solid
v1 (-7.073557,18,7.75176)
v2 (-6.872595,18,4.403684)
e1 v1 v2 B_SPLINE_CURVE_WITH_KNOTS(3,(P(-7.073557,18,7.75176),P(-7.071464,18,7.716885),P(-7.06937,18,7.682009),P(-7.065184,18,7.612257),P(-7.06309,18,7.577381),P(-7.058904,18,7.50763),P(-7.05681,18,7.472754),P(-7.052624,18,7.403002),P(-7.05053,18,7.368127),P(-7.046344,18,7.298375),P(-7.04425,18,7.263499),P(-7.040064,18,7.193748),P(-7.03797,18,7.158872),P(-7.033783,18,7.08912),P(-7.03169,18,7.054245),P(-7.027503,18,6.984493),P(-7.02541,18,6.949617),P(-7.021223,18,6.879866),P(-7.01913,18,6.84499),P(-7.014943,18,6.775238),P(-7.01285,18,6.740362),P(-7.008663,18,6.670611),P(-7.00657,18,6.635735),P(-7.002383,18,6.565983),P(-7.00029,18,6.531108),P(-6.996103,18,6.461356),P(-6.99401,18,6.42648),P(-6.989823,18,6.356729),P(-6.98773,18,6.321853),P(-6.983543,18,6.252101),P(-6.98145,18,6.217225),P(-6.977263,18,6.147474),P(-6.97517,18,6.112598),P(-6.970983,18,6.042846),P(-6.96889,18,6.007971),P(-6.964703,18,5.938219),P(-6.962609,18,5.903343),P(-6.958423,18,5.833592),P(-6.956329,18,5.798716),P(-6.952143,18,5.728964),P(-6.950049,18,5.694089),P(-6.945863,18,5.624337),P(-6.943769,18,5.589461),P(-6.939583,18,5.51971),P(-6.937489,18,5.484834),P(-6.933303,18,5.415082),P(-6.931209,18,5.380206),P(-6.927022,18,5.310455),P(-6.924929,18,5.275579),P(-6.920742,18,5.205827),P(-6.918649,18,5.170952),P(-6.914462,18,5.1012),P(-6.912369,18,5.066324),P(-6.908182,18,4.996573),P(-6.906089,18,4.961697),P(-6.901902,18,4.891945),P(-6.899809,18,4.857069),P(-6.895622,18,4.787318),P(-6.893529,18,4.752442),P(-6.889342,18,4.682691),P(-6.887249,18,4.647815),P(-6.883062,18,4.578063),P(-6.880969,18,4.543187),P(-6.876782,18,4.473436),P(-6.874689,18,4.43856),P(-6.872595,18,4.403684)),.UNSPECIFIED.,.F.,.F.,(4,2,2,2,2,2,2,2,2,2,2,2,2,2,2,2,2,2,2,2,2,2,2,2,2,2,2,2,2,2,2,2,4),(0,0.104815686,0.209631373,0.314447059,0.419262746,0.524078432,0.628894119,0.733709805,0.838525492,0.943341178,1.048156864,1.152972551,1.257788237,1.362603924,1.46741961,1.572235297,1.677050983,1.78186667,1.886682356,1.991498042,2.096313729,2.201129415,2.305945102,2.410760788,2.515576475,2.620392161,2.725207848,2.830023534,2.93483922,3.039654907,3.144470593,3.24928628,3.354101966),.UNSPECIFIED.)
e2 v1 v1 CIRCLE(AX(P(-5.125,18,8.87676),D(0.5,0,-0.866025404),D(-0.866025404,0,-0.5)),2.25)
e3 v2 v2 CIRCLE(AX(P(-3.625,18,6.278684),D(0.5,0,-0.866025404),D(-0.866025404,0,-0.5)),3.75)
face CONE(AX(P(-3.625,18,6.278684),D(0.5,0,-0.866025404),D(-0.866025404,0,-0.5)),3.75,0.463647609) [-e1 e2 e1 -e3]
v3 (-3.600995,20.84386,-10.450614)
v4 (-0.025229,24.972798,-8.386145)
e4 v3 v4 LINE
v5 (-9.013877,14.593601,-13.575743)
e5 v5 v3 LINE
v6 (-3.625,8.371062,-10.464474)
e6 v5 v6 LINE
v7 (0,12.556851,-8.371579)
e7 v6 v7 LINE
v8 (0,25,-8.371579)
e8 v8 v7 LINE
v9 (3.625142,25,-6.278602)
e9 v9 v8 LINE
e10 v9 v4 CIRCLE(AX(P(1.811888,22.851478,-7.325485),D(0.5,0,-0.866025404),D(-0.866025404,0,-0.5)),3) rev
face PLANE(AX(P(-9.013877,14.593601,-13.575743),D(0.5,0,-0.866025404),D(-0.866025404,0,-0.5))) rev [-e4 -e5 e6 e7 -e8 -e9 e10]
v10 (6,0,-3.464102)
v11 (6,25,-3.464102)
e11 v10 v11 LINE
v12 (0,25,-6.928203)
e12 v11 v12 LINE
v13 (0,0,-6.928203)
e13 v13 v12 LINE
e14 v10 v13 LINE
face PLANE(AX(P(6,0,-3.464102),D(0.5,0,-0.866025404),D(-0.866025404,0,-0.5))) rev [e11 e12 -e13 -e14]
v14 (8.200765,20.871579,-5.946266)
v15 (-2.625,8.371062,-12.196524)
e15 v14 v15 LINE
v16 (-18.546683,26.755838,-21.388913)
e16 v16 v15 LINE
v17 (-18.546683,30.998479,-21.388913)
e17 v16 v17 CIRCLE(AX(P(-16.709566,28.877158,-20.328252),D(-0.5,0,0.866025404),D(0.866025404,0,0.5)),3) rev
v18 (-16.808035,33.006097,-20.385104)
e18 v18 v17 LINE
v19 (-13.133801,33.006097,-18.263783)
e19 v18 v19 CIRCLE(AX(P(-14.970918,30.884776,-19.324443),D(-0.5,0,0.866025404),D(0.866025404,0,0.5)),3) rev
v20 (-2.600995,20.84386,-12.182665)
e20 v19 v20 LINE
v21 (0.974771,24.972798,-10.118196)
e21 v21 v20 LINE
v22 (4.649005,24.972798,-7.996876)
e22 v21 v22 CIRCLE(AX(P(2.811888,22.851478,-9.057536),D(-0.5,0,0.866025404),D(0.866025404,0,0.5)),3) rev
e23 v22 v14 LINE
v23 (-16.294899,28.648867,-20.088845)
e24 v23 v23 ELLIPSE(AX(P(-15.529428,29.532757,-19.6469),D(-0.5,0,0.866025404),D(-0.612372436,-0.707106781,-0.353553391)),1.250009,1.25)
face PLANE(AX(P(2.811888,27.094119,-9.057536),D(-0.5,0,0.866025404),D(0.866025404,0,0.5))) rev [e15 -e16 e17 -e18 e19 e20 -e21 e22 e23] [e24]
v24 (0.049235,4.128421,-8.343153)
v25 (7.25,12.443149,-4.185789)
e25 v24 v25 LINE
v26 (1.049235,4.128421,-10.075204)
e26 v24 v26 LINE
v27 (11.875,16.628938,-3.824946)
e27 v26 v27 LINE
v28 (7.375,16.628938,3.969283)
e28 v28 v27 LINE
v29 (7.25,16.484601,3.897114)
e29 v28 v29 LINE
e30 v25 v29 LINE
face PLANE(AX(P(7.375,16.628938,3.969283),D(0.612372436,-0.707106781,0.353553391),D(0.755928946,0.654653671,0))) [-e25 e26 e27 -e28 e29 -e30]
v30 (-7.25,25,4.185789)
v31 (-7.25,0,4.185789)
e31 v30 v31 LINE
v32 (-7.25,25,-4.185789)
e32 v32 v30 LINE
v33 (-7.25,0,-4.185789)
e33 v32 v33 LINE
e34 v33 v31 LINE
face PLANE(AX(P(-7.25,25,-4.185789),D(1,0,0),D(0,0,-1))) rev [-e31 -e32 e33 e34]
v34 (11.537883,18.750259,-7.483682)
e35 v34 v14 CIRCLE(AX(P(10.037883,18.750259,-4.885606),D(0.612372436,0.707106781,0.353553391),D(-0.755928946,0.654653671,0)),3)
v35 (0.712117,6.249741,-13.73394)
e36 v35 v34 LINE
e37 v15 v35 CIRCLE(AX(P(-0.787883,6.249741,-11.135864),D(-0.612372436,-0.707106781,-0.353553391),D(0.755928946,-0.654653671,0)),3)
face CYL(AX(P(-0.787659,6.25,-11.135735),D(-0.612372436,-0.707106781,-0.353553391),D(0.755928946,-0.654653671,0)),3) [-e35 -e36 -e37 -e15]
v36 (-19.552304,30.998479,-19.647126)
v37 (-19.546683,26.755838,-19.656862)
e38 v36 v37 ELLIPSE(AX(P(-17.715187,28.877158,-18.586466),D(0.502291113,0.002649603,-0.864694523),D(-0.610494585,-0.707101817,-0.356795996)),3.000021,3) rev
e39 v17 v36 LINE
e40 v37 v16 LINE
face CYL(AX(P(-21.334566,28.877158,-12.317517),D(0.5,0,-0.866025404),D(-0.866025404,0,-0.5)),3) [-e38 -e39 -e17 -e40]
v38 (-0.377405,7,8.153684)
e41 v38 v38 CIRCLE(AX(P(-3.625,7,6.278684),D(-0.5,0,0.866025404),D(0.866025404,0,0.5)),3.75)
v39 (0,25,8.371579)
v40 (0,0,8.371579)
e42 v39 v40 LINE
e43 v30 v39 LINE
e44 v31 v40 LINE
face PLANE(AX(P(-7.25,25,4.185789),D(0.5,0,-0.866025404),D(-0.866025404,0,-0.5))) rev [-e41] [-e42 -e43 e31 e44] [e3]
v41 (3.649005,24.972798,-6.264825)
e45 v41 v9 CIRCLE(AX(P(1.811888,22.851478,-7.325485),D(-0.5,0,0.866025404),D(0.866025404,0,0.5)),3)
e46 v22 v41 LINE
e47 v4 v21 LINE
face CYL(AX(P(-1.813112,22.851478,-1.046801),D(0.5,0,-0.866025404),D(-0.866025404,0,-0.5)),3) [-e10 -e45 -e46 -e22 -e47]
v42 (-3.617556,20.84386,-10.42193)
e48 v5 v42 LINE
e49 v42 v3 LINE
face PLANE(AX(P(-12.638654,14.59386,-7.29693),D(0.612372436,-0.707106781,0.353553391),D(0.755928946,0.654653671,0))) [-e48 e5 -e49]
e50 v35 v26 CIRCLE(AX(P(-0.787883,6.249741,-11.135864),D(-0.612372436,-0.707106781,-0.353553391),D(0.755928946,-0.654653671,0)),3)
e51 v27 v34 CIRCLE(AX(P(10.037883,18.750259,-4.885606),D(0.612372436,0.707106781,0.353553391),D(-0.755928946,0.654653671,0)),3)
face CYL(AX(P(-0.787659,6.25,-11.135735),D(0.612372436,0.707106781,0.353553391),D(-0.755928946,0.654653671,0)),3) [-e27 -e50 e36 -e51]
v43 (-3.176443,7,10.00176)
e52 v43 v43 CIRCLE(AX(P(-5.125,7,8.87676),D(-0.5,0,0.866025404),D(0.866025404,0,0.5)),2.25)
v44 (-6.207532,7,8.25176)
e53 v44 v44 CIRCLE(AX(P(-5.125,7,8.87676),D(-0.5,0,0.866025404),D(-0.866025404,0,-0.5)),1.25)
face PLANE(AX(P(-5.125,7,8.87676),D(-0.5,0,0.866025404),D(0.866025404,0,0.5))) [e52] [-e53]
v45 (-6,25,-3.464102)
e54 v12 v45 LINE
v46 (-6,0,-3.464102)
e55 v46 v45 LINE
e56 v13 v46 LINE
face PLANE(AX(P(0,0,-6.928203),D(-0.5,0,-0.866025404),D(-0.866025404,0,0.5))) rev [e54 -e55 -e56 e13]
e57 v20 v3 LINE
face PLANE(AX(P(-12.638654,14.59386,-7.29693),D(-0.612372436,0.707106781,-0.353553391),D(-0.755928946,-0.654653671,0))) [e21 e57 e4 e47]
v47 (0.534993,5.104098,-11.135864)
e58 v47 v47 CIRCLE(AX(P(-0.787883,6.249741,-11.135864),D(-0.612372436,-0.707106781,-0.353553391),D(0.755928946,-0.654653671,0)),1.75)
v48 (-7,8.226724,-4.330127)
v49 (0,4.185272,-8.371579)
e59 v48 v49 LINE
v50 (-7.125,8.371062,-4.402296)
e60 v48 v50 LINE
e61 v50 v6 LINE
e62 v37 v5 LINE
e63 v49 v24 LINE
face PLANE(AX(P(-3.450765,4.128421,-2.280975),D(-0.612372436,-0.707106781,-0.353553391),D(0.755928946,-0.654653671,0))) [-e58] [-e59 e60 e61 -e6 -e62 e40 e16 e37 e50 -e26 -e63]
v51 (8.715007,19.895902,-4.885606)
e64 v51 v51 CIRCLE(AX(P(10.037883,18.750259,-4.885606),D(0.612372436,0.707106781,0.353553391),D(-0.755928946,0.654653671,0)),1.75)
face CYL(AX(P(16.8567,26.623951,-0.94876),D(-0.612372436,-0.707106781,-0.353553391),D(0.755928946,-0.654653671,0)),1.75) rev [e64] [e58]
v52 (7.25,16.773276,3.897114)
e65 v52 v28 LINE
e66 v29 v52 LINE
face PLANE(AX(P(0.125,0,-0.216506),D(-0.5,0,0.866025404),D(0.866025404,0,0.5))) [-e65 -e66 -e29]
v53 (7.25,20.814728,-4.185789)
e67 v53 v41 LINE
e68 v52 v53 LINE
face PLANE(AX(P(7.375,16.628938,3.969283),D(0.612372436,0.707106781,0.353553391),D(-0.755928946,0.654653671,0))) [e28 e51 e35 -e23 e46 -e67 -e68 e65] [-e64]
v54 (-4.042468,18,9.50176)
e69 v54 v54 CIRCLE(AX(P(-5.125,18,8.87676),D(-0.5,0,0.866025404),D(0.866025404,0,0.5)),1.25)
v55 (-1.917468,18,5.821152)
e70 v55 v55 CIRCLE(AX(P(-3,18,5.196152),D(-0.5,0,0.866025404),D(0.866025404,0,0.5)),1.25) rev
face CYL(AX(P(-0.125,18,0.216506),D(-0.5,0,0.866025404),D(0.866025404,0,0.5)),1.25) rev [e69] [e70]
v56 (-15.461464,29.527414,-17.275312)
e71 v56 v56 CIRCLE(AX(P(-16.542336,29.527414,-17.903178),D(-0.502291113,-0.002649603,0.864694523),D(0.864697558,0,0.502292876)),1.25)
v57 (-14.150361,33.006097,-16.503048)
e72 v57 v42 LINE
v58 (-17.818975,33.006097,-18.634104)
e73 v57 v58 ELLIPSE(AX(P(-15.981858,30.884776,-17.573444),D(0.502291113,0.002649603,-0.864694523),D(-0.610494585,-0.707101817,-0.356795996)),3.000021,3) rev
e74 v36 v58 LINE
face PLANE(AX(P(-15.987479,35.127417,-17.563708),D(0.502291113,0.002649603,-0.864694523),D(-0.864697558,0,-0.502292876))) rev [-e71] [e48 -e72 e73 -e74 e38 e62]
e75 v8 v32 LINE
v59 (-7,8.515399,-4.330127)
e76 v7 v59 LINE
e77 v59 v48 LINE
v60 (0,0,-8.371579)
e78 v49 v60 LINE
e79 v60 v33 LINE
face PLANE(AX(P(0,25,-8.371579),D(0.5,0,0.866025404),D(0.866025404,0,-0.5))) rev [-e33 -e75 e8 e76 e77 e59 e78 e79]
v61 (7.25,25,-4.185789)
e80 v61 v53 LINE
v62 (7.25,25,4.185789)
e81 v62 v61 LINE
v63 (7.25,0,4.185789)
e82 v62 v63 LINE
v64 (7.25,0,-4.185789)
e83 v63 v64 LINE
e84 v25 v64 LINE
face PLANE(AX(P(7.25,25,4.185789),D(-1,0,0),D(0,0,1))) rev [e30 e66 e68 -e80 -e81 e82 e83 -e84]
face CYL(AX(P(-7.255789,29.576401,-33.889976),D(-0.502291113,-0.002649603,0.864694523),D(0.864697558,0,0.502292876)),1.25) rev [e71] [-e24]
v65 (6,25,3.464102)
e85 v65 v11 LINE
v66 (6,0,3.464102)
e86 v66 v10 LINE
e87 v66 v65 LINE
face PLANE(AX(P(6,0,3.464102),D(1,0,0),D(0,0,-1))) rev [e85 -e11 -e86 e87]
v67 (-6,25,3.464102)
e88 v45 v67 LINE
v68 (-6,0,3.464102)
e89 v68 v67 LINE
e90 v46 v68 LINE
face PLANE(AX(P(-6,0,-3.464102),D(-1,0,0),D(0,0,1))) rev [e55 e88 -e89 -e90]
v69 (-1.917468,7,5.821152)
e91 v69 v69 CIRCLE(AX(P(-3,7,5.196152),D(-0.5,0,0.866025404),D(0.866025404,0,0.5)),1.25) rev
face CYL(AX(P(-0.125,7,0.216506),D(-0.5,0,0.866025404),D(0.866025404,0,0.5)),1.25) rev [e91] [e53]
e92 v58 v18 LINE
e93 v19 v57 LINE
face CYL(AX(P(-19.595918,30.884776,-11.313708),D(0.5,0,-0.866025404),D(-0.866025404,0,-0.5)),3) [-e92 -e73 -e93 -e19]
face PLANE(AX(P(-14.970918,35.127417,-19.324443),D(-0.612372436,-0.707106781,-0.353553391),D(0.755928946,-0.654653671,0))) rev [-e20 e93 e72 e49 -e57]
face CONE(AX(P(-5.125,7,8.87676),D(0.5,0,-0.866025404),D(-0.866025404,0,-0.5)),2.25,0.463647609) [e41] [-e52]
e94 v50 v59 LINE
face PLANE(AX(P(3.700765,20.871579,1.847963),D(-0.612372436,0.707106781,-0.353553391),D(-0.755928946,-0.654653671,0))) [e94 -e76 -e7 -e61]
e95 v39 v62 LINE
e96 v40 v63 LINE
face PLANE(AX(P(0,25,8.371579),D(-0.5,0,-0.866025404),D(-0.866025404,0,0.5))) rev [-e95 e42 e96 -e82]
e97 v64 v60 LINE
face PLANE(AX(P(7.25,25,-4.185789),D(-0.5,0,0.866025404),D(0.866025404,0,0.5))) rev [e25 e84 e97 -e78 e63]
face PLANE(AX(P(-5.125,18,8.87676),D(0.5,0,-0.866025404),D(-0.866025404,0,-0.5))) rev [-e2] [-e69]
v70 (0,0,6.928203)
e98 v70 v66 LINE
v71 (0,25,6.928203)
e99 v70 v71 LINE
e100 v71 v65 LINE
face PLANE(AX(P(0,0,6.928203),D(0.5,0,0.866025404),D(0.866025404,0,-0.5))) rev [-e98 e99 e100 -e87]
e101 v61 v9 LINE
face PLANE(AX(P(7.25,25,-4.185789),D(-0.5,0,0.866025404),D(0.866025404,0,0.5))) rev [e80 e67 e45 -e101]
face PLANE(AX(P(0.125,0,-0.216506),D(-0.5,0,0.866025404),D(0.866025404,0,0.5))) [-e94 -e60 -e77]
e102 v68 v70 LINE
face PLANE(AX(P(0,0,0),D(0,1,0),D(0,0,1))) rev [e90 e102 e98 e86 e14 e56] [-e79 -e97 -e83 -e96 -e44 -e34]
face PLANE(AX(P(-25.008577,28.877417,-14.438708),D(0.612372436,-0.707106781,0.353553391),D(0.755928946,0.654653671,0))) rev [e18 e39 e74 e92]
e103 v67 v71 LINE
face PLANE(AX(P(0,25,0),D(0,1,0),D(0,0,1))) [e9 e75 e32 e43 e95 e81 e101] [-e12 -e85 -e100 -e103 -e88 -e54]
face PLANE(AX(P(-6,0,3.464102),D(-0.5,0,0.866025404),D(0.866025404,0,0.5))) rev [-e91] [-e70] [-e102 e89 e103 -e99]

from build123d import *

# Parameters (mm, degrees)
RESSALTO_EXTRUS_O1_DEPTH      = 25
ESBO_O3_R                     = 2.25
RESSALTO_EXTRUS_O2_DEPTH      = 3
ESBO_O6_R                     = 1.25
CORTE_EXTRUS_O2_DEPTH         = 10
RESSALTO_EXTRUS_O3_DEPTH      = 5
RESSALTO_EXTRUS_O3_DEPTH_BACK = 7
CORTE_EXTRUS_O1_DEPTH         = 32.980788504
FILETE1_R                     = 3
ESBO_O9_R                     = 1.75
CORTE_EXTRUS_O3_DEPTH         = 32.199307287
RESSALTO_EXTRUS_O4_DEPTH      = 8.8
RESSALTO_EXTRUS_O5_DEPTH      = 20.2
ESBO_O14_R                    = 1.25
CORTE_EXTRUS_O4_DEPTH         = 47.082463565
FILETE2_R                     = 3
FILETE3_R                     = 3


# Some blends are built 0.0001 mm under size
with BuildPart() as part:
    # Esboço1 → Ressalto-extrusão1 (new body)
    with BuildSketch(Plane(origin=(0, 0, 0), x_dir=(1, 0, 0), z_dir=(0, 1, 0))):
        Polygon((7.25, 4.185789452), (0, 8.371578903), (-7.25, 4.185789452), (-7.25, -4.185789452), (0, -8.371578903), (7.25, -4.185789452), align=None)
    extrude(amount=RESSALTO_EXTRUS_O1_DEPTH)

    # Esboço3 → Ressalto-extrusão2 (add)
    with BuildSketch(Plane(origin=(-3.625, 0, 6.278684177), x_dir=(0.8660254037844387, 0, 0.4999999999999999), z_dir=(-0.49999999999999994, 0, 0.8660254037844388))):
        with Locations(Location((0, 7, 0), (0, 0, 180))):
            Circle(ESBO_O3_R)
        with Locations(Location((0, 18, 0), (0, 0, 180))):
            Circle(ESBO_O3_R)
    extrude(amount=RESSALTO_EXTRUS_O2_DEPTH)

    # Esboço4 → Revolução1 (revolve)
    with BuildSketch(Plane(origin=(0, 18, 0), x_dir=(1, 0, 0), z_dir=(0, 1, 0))):
        Polygon((-7.073557159, -7.751760389), (-6.872595264, -4.403684177), (-5.573557159, -5.153684177), align=None)
    revolve(axis=Axis((-2.565266445, 18, 4.443171818), (-0.5000000000000001, 0, 0.8660254037844386)))

    # Esboço5 → Revolução2 (revolve)
    with BuildSketch(Plane(origin=(0, 7, 0), x_dir=(-1, 0, 0), z_dir=(0, -1, 0)), mode=Mode.PRIVATE) as revolu_o2_sk:
        Polygon((7.073557159, -7.751760389), (5.573557159, -5.153684177), (6.872595264, -4.403684177), align=None)
    revolve(revolu_o2_sk.sketch.rotate(Axis((-5.573557159, 7, 9.653684177), (0.4999999999999998, 0, -0.8660254037844388)), 180), axis=Axis((-5.573557159, 7, 9.653684177), (0.4999999999999998, 0, -0.8660254037844388)))

    # Esboço6 → Corte-extrusão2 (cut)
    with BuildSketch(Plane(origin=(-5.125, 0, 8.876760389), x_dir=(0.8660254037844386, 0, 0.5), z_dir=(-0.5000000000000001, 0, 0.8660254037844387))):
        with Locations((0, 18)):
            Circle(ESBO_O6_R)
        with Locations(Location((0, 7, 0), (0, 0, 180))):
            Circle(ESBO_O6_R)
    extrude(amount=-CORTE_EXTRUS_O2_DEPTH, mode=Mode.SUBTRACT)

    # Esboço8 → Ressalto-extrusão3 (add, two sides: drawn at the far end of the back side and taken through both)
    with BuildSketch(Plane(origin=(3.625, 0, -6.278684177), x_dir=(-0.8660254037844386, 0, -0.4999999999999999), z_dir=(0.49999999999999994, 0, -0.8660254037844387)).offset(-RESSALTO_EXTRUS_O3_DEPTH_BACK)):
        Polygon((-4.128938216, 20.871578903), (8.371578903, 8.371061784), (4.128938216, 4.128421097), (-8.371578903, 16.628938216), align=None)
    extrude(amount=RESSALTO_EXTRUS_O3_DEPTH + RESSALTO_EXTRUS_O3_DEPTH_BACK)

    # Esboço2 → Corte-extrusão1 (cut, through all)
    with BuildSketch(Plane(origin=(0, 25, 0), x_dir=(1, 0, 0), z_dir=(0, 1, 0))):
        Polygon((0, 6.92820323), (-6, 3.464101615), (-6, -3.464101615), (0, -6.92820323), (6, -3.464101615), (6, 3.464101615), align=None)
    extrude(amount=-CORTE_EXTRUS_O1_DEPTH, mode=Mode.SUBTRACT)

    # Filete1
    filete1_edges = [part.edges().sort_by_distance(p)[0] for p in [
        (7.962117307, 10.378679656, -9.548151025),
        (4.287882693, 14.621320344, -11.669471368),
    ]]
    fillet(filete1_edges, radius=FILETE1_R - 0.0001)  # a hair under: the kernel refuses the full size

    # Esboço9 → Corte-extrusão3 (cut, through all)
    with BuildSketch(Plane(origin=(-0.000223919, -0.00025856, -0.00012928), x_dir=(0.7905694150420967, -0.547722557505165, -0.27386127875258026), z_dir=(-0.6123724356957922, -0.7071067811865502, -0.3535533905932724))):
        with Locations(Location((-0.996318298, -12.755189134, 0), (0, 0, 17.023866185))):
            Circle(ESBO_O9_R)
    extrude(amount=-CORTE_EXTRUS_O3_DEPTH, mode=Mode.SUBTRACT)

    # Esboço10 → Ressalto-extrusão4 (add)
    with BuildSketch(Plane(origin=(-7.249776081, 8.371320344, -4.185660172), x_dir=(0.7905694150420924, 0.5477225575051679, -0.2738612787525866), z_dir=(-0.6123724356957977, 0.707106781186544, -0.3535533905932755))):
        Polygon((5.849930433, 7.165250453), (4.585019369, 5.616057115), (18.278649783, -5.564745298), (19.543560847, -4.01555196), align=None)
    extrude(amount=RESSALTO_EXTRUS_O4_DEPTH)

    # Esboço13 → Ressalto-extrusão5 (add)
    with BuildSketch(Plane(origin=(-12.638653515, 14.593860018, -7.296930009), x_dir=(0.7905694150420924, 0.547722557505168, -0.27386127875258653), z_dir=(-0.6123724356957978, 0.707106781186544, -0.35355339059327534))):
        Polygon((4.585019369, 5.616057115), (5.849930433, 7.165250453), (12.69674564, 1.574849247), (11.410886615, 0), align=None)
    extrude(amount=RESSALTO_EXTRUS_O5_DEPTH)

    # Esboço14 → Corte-extrusão4 (cut, through all)
    with BuildSketch(Plane(origin=(3.641584315, 0.01920948, -6.268990093), x_dir=(0.8646985820812304, -0.0015391164783120645, 0.5022887548683287), z_dir=(-0.5022911129481685, -0.002649602595281497, 0.8646945226259835))):
        with Locations(Location((-23.342145929, 29.472416585, 0), (0, 0, 0.088185223))):
            Circle(ESBO_O14_R)
    extrude(amount=-CORTE_EXTRUS_O4_DEPTH, mode=Mode.SUBTRACT)

    # Filete2
    filete2_edges = [part.edges().sort_by_distance(p)[0] for p in [
        (-15.479198351, 35.127416998, -18.444075991),
        (-20.883800635, 28.877158438, -21.58354736),
    ]]
    fillet(filete2_edges, radius=FILETE2_R)

    # Filete3
    # the kernel refuses this fillet: 3 mm, written as the material it takes off along each edge
    with BuildSketch(Plane(origin=(1.811887952, 27.094118578, -7.325484907), x_dir=(0.6123724356957967, -0.707106781186545, 0.3535533905932749), z_dir=(0.49999999999999784, -2.3869795029440866e-15, -0.86602540378444))) as filete3_piece_1:
        with BuildLine():
            CenterArc((FILETE3_R, FILETE3_R), FILETE3_R, 180, 90)
            Line((0, FILETE3_R), (0, 0))
            Line((0, 0), (FILETE3_R, 0))
        make_face()
    extrude(amount=9.5, mode=Mode.SUBTRACT)


solid = part.part
